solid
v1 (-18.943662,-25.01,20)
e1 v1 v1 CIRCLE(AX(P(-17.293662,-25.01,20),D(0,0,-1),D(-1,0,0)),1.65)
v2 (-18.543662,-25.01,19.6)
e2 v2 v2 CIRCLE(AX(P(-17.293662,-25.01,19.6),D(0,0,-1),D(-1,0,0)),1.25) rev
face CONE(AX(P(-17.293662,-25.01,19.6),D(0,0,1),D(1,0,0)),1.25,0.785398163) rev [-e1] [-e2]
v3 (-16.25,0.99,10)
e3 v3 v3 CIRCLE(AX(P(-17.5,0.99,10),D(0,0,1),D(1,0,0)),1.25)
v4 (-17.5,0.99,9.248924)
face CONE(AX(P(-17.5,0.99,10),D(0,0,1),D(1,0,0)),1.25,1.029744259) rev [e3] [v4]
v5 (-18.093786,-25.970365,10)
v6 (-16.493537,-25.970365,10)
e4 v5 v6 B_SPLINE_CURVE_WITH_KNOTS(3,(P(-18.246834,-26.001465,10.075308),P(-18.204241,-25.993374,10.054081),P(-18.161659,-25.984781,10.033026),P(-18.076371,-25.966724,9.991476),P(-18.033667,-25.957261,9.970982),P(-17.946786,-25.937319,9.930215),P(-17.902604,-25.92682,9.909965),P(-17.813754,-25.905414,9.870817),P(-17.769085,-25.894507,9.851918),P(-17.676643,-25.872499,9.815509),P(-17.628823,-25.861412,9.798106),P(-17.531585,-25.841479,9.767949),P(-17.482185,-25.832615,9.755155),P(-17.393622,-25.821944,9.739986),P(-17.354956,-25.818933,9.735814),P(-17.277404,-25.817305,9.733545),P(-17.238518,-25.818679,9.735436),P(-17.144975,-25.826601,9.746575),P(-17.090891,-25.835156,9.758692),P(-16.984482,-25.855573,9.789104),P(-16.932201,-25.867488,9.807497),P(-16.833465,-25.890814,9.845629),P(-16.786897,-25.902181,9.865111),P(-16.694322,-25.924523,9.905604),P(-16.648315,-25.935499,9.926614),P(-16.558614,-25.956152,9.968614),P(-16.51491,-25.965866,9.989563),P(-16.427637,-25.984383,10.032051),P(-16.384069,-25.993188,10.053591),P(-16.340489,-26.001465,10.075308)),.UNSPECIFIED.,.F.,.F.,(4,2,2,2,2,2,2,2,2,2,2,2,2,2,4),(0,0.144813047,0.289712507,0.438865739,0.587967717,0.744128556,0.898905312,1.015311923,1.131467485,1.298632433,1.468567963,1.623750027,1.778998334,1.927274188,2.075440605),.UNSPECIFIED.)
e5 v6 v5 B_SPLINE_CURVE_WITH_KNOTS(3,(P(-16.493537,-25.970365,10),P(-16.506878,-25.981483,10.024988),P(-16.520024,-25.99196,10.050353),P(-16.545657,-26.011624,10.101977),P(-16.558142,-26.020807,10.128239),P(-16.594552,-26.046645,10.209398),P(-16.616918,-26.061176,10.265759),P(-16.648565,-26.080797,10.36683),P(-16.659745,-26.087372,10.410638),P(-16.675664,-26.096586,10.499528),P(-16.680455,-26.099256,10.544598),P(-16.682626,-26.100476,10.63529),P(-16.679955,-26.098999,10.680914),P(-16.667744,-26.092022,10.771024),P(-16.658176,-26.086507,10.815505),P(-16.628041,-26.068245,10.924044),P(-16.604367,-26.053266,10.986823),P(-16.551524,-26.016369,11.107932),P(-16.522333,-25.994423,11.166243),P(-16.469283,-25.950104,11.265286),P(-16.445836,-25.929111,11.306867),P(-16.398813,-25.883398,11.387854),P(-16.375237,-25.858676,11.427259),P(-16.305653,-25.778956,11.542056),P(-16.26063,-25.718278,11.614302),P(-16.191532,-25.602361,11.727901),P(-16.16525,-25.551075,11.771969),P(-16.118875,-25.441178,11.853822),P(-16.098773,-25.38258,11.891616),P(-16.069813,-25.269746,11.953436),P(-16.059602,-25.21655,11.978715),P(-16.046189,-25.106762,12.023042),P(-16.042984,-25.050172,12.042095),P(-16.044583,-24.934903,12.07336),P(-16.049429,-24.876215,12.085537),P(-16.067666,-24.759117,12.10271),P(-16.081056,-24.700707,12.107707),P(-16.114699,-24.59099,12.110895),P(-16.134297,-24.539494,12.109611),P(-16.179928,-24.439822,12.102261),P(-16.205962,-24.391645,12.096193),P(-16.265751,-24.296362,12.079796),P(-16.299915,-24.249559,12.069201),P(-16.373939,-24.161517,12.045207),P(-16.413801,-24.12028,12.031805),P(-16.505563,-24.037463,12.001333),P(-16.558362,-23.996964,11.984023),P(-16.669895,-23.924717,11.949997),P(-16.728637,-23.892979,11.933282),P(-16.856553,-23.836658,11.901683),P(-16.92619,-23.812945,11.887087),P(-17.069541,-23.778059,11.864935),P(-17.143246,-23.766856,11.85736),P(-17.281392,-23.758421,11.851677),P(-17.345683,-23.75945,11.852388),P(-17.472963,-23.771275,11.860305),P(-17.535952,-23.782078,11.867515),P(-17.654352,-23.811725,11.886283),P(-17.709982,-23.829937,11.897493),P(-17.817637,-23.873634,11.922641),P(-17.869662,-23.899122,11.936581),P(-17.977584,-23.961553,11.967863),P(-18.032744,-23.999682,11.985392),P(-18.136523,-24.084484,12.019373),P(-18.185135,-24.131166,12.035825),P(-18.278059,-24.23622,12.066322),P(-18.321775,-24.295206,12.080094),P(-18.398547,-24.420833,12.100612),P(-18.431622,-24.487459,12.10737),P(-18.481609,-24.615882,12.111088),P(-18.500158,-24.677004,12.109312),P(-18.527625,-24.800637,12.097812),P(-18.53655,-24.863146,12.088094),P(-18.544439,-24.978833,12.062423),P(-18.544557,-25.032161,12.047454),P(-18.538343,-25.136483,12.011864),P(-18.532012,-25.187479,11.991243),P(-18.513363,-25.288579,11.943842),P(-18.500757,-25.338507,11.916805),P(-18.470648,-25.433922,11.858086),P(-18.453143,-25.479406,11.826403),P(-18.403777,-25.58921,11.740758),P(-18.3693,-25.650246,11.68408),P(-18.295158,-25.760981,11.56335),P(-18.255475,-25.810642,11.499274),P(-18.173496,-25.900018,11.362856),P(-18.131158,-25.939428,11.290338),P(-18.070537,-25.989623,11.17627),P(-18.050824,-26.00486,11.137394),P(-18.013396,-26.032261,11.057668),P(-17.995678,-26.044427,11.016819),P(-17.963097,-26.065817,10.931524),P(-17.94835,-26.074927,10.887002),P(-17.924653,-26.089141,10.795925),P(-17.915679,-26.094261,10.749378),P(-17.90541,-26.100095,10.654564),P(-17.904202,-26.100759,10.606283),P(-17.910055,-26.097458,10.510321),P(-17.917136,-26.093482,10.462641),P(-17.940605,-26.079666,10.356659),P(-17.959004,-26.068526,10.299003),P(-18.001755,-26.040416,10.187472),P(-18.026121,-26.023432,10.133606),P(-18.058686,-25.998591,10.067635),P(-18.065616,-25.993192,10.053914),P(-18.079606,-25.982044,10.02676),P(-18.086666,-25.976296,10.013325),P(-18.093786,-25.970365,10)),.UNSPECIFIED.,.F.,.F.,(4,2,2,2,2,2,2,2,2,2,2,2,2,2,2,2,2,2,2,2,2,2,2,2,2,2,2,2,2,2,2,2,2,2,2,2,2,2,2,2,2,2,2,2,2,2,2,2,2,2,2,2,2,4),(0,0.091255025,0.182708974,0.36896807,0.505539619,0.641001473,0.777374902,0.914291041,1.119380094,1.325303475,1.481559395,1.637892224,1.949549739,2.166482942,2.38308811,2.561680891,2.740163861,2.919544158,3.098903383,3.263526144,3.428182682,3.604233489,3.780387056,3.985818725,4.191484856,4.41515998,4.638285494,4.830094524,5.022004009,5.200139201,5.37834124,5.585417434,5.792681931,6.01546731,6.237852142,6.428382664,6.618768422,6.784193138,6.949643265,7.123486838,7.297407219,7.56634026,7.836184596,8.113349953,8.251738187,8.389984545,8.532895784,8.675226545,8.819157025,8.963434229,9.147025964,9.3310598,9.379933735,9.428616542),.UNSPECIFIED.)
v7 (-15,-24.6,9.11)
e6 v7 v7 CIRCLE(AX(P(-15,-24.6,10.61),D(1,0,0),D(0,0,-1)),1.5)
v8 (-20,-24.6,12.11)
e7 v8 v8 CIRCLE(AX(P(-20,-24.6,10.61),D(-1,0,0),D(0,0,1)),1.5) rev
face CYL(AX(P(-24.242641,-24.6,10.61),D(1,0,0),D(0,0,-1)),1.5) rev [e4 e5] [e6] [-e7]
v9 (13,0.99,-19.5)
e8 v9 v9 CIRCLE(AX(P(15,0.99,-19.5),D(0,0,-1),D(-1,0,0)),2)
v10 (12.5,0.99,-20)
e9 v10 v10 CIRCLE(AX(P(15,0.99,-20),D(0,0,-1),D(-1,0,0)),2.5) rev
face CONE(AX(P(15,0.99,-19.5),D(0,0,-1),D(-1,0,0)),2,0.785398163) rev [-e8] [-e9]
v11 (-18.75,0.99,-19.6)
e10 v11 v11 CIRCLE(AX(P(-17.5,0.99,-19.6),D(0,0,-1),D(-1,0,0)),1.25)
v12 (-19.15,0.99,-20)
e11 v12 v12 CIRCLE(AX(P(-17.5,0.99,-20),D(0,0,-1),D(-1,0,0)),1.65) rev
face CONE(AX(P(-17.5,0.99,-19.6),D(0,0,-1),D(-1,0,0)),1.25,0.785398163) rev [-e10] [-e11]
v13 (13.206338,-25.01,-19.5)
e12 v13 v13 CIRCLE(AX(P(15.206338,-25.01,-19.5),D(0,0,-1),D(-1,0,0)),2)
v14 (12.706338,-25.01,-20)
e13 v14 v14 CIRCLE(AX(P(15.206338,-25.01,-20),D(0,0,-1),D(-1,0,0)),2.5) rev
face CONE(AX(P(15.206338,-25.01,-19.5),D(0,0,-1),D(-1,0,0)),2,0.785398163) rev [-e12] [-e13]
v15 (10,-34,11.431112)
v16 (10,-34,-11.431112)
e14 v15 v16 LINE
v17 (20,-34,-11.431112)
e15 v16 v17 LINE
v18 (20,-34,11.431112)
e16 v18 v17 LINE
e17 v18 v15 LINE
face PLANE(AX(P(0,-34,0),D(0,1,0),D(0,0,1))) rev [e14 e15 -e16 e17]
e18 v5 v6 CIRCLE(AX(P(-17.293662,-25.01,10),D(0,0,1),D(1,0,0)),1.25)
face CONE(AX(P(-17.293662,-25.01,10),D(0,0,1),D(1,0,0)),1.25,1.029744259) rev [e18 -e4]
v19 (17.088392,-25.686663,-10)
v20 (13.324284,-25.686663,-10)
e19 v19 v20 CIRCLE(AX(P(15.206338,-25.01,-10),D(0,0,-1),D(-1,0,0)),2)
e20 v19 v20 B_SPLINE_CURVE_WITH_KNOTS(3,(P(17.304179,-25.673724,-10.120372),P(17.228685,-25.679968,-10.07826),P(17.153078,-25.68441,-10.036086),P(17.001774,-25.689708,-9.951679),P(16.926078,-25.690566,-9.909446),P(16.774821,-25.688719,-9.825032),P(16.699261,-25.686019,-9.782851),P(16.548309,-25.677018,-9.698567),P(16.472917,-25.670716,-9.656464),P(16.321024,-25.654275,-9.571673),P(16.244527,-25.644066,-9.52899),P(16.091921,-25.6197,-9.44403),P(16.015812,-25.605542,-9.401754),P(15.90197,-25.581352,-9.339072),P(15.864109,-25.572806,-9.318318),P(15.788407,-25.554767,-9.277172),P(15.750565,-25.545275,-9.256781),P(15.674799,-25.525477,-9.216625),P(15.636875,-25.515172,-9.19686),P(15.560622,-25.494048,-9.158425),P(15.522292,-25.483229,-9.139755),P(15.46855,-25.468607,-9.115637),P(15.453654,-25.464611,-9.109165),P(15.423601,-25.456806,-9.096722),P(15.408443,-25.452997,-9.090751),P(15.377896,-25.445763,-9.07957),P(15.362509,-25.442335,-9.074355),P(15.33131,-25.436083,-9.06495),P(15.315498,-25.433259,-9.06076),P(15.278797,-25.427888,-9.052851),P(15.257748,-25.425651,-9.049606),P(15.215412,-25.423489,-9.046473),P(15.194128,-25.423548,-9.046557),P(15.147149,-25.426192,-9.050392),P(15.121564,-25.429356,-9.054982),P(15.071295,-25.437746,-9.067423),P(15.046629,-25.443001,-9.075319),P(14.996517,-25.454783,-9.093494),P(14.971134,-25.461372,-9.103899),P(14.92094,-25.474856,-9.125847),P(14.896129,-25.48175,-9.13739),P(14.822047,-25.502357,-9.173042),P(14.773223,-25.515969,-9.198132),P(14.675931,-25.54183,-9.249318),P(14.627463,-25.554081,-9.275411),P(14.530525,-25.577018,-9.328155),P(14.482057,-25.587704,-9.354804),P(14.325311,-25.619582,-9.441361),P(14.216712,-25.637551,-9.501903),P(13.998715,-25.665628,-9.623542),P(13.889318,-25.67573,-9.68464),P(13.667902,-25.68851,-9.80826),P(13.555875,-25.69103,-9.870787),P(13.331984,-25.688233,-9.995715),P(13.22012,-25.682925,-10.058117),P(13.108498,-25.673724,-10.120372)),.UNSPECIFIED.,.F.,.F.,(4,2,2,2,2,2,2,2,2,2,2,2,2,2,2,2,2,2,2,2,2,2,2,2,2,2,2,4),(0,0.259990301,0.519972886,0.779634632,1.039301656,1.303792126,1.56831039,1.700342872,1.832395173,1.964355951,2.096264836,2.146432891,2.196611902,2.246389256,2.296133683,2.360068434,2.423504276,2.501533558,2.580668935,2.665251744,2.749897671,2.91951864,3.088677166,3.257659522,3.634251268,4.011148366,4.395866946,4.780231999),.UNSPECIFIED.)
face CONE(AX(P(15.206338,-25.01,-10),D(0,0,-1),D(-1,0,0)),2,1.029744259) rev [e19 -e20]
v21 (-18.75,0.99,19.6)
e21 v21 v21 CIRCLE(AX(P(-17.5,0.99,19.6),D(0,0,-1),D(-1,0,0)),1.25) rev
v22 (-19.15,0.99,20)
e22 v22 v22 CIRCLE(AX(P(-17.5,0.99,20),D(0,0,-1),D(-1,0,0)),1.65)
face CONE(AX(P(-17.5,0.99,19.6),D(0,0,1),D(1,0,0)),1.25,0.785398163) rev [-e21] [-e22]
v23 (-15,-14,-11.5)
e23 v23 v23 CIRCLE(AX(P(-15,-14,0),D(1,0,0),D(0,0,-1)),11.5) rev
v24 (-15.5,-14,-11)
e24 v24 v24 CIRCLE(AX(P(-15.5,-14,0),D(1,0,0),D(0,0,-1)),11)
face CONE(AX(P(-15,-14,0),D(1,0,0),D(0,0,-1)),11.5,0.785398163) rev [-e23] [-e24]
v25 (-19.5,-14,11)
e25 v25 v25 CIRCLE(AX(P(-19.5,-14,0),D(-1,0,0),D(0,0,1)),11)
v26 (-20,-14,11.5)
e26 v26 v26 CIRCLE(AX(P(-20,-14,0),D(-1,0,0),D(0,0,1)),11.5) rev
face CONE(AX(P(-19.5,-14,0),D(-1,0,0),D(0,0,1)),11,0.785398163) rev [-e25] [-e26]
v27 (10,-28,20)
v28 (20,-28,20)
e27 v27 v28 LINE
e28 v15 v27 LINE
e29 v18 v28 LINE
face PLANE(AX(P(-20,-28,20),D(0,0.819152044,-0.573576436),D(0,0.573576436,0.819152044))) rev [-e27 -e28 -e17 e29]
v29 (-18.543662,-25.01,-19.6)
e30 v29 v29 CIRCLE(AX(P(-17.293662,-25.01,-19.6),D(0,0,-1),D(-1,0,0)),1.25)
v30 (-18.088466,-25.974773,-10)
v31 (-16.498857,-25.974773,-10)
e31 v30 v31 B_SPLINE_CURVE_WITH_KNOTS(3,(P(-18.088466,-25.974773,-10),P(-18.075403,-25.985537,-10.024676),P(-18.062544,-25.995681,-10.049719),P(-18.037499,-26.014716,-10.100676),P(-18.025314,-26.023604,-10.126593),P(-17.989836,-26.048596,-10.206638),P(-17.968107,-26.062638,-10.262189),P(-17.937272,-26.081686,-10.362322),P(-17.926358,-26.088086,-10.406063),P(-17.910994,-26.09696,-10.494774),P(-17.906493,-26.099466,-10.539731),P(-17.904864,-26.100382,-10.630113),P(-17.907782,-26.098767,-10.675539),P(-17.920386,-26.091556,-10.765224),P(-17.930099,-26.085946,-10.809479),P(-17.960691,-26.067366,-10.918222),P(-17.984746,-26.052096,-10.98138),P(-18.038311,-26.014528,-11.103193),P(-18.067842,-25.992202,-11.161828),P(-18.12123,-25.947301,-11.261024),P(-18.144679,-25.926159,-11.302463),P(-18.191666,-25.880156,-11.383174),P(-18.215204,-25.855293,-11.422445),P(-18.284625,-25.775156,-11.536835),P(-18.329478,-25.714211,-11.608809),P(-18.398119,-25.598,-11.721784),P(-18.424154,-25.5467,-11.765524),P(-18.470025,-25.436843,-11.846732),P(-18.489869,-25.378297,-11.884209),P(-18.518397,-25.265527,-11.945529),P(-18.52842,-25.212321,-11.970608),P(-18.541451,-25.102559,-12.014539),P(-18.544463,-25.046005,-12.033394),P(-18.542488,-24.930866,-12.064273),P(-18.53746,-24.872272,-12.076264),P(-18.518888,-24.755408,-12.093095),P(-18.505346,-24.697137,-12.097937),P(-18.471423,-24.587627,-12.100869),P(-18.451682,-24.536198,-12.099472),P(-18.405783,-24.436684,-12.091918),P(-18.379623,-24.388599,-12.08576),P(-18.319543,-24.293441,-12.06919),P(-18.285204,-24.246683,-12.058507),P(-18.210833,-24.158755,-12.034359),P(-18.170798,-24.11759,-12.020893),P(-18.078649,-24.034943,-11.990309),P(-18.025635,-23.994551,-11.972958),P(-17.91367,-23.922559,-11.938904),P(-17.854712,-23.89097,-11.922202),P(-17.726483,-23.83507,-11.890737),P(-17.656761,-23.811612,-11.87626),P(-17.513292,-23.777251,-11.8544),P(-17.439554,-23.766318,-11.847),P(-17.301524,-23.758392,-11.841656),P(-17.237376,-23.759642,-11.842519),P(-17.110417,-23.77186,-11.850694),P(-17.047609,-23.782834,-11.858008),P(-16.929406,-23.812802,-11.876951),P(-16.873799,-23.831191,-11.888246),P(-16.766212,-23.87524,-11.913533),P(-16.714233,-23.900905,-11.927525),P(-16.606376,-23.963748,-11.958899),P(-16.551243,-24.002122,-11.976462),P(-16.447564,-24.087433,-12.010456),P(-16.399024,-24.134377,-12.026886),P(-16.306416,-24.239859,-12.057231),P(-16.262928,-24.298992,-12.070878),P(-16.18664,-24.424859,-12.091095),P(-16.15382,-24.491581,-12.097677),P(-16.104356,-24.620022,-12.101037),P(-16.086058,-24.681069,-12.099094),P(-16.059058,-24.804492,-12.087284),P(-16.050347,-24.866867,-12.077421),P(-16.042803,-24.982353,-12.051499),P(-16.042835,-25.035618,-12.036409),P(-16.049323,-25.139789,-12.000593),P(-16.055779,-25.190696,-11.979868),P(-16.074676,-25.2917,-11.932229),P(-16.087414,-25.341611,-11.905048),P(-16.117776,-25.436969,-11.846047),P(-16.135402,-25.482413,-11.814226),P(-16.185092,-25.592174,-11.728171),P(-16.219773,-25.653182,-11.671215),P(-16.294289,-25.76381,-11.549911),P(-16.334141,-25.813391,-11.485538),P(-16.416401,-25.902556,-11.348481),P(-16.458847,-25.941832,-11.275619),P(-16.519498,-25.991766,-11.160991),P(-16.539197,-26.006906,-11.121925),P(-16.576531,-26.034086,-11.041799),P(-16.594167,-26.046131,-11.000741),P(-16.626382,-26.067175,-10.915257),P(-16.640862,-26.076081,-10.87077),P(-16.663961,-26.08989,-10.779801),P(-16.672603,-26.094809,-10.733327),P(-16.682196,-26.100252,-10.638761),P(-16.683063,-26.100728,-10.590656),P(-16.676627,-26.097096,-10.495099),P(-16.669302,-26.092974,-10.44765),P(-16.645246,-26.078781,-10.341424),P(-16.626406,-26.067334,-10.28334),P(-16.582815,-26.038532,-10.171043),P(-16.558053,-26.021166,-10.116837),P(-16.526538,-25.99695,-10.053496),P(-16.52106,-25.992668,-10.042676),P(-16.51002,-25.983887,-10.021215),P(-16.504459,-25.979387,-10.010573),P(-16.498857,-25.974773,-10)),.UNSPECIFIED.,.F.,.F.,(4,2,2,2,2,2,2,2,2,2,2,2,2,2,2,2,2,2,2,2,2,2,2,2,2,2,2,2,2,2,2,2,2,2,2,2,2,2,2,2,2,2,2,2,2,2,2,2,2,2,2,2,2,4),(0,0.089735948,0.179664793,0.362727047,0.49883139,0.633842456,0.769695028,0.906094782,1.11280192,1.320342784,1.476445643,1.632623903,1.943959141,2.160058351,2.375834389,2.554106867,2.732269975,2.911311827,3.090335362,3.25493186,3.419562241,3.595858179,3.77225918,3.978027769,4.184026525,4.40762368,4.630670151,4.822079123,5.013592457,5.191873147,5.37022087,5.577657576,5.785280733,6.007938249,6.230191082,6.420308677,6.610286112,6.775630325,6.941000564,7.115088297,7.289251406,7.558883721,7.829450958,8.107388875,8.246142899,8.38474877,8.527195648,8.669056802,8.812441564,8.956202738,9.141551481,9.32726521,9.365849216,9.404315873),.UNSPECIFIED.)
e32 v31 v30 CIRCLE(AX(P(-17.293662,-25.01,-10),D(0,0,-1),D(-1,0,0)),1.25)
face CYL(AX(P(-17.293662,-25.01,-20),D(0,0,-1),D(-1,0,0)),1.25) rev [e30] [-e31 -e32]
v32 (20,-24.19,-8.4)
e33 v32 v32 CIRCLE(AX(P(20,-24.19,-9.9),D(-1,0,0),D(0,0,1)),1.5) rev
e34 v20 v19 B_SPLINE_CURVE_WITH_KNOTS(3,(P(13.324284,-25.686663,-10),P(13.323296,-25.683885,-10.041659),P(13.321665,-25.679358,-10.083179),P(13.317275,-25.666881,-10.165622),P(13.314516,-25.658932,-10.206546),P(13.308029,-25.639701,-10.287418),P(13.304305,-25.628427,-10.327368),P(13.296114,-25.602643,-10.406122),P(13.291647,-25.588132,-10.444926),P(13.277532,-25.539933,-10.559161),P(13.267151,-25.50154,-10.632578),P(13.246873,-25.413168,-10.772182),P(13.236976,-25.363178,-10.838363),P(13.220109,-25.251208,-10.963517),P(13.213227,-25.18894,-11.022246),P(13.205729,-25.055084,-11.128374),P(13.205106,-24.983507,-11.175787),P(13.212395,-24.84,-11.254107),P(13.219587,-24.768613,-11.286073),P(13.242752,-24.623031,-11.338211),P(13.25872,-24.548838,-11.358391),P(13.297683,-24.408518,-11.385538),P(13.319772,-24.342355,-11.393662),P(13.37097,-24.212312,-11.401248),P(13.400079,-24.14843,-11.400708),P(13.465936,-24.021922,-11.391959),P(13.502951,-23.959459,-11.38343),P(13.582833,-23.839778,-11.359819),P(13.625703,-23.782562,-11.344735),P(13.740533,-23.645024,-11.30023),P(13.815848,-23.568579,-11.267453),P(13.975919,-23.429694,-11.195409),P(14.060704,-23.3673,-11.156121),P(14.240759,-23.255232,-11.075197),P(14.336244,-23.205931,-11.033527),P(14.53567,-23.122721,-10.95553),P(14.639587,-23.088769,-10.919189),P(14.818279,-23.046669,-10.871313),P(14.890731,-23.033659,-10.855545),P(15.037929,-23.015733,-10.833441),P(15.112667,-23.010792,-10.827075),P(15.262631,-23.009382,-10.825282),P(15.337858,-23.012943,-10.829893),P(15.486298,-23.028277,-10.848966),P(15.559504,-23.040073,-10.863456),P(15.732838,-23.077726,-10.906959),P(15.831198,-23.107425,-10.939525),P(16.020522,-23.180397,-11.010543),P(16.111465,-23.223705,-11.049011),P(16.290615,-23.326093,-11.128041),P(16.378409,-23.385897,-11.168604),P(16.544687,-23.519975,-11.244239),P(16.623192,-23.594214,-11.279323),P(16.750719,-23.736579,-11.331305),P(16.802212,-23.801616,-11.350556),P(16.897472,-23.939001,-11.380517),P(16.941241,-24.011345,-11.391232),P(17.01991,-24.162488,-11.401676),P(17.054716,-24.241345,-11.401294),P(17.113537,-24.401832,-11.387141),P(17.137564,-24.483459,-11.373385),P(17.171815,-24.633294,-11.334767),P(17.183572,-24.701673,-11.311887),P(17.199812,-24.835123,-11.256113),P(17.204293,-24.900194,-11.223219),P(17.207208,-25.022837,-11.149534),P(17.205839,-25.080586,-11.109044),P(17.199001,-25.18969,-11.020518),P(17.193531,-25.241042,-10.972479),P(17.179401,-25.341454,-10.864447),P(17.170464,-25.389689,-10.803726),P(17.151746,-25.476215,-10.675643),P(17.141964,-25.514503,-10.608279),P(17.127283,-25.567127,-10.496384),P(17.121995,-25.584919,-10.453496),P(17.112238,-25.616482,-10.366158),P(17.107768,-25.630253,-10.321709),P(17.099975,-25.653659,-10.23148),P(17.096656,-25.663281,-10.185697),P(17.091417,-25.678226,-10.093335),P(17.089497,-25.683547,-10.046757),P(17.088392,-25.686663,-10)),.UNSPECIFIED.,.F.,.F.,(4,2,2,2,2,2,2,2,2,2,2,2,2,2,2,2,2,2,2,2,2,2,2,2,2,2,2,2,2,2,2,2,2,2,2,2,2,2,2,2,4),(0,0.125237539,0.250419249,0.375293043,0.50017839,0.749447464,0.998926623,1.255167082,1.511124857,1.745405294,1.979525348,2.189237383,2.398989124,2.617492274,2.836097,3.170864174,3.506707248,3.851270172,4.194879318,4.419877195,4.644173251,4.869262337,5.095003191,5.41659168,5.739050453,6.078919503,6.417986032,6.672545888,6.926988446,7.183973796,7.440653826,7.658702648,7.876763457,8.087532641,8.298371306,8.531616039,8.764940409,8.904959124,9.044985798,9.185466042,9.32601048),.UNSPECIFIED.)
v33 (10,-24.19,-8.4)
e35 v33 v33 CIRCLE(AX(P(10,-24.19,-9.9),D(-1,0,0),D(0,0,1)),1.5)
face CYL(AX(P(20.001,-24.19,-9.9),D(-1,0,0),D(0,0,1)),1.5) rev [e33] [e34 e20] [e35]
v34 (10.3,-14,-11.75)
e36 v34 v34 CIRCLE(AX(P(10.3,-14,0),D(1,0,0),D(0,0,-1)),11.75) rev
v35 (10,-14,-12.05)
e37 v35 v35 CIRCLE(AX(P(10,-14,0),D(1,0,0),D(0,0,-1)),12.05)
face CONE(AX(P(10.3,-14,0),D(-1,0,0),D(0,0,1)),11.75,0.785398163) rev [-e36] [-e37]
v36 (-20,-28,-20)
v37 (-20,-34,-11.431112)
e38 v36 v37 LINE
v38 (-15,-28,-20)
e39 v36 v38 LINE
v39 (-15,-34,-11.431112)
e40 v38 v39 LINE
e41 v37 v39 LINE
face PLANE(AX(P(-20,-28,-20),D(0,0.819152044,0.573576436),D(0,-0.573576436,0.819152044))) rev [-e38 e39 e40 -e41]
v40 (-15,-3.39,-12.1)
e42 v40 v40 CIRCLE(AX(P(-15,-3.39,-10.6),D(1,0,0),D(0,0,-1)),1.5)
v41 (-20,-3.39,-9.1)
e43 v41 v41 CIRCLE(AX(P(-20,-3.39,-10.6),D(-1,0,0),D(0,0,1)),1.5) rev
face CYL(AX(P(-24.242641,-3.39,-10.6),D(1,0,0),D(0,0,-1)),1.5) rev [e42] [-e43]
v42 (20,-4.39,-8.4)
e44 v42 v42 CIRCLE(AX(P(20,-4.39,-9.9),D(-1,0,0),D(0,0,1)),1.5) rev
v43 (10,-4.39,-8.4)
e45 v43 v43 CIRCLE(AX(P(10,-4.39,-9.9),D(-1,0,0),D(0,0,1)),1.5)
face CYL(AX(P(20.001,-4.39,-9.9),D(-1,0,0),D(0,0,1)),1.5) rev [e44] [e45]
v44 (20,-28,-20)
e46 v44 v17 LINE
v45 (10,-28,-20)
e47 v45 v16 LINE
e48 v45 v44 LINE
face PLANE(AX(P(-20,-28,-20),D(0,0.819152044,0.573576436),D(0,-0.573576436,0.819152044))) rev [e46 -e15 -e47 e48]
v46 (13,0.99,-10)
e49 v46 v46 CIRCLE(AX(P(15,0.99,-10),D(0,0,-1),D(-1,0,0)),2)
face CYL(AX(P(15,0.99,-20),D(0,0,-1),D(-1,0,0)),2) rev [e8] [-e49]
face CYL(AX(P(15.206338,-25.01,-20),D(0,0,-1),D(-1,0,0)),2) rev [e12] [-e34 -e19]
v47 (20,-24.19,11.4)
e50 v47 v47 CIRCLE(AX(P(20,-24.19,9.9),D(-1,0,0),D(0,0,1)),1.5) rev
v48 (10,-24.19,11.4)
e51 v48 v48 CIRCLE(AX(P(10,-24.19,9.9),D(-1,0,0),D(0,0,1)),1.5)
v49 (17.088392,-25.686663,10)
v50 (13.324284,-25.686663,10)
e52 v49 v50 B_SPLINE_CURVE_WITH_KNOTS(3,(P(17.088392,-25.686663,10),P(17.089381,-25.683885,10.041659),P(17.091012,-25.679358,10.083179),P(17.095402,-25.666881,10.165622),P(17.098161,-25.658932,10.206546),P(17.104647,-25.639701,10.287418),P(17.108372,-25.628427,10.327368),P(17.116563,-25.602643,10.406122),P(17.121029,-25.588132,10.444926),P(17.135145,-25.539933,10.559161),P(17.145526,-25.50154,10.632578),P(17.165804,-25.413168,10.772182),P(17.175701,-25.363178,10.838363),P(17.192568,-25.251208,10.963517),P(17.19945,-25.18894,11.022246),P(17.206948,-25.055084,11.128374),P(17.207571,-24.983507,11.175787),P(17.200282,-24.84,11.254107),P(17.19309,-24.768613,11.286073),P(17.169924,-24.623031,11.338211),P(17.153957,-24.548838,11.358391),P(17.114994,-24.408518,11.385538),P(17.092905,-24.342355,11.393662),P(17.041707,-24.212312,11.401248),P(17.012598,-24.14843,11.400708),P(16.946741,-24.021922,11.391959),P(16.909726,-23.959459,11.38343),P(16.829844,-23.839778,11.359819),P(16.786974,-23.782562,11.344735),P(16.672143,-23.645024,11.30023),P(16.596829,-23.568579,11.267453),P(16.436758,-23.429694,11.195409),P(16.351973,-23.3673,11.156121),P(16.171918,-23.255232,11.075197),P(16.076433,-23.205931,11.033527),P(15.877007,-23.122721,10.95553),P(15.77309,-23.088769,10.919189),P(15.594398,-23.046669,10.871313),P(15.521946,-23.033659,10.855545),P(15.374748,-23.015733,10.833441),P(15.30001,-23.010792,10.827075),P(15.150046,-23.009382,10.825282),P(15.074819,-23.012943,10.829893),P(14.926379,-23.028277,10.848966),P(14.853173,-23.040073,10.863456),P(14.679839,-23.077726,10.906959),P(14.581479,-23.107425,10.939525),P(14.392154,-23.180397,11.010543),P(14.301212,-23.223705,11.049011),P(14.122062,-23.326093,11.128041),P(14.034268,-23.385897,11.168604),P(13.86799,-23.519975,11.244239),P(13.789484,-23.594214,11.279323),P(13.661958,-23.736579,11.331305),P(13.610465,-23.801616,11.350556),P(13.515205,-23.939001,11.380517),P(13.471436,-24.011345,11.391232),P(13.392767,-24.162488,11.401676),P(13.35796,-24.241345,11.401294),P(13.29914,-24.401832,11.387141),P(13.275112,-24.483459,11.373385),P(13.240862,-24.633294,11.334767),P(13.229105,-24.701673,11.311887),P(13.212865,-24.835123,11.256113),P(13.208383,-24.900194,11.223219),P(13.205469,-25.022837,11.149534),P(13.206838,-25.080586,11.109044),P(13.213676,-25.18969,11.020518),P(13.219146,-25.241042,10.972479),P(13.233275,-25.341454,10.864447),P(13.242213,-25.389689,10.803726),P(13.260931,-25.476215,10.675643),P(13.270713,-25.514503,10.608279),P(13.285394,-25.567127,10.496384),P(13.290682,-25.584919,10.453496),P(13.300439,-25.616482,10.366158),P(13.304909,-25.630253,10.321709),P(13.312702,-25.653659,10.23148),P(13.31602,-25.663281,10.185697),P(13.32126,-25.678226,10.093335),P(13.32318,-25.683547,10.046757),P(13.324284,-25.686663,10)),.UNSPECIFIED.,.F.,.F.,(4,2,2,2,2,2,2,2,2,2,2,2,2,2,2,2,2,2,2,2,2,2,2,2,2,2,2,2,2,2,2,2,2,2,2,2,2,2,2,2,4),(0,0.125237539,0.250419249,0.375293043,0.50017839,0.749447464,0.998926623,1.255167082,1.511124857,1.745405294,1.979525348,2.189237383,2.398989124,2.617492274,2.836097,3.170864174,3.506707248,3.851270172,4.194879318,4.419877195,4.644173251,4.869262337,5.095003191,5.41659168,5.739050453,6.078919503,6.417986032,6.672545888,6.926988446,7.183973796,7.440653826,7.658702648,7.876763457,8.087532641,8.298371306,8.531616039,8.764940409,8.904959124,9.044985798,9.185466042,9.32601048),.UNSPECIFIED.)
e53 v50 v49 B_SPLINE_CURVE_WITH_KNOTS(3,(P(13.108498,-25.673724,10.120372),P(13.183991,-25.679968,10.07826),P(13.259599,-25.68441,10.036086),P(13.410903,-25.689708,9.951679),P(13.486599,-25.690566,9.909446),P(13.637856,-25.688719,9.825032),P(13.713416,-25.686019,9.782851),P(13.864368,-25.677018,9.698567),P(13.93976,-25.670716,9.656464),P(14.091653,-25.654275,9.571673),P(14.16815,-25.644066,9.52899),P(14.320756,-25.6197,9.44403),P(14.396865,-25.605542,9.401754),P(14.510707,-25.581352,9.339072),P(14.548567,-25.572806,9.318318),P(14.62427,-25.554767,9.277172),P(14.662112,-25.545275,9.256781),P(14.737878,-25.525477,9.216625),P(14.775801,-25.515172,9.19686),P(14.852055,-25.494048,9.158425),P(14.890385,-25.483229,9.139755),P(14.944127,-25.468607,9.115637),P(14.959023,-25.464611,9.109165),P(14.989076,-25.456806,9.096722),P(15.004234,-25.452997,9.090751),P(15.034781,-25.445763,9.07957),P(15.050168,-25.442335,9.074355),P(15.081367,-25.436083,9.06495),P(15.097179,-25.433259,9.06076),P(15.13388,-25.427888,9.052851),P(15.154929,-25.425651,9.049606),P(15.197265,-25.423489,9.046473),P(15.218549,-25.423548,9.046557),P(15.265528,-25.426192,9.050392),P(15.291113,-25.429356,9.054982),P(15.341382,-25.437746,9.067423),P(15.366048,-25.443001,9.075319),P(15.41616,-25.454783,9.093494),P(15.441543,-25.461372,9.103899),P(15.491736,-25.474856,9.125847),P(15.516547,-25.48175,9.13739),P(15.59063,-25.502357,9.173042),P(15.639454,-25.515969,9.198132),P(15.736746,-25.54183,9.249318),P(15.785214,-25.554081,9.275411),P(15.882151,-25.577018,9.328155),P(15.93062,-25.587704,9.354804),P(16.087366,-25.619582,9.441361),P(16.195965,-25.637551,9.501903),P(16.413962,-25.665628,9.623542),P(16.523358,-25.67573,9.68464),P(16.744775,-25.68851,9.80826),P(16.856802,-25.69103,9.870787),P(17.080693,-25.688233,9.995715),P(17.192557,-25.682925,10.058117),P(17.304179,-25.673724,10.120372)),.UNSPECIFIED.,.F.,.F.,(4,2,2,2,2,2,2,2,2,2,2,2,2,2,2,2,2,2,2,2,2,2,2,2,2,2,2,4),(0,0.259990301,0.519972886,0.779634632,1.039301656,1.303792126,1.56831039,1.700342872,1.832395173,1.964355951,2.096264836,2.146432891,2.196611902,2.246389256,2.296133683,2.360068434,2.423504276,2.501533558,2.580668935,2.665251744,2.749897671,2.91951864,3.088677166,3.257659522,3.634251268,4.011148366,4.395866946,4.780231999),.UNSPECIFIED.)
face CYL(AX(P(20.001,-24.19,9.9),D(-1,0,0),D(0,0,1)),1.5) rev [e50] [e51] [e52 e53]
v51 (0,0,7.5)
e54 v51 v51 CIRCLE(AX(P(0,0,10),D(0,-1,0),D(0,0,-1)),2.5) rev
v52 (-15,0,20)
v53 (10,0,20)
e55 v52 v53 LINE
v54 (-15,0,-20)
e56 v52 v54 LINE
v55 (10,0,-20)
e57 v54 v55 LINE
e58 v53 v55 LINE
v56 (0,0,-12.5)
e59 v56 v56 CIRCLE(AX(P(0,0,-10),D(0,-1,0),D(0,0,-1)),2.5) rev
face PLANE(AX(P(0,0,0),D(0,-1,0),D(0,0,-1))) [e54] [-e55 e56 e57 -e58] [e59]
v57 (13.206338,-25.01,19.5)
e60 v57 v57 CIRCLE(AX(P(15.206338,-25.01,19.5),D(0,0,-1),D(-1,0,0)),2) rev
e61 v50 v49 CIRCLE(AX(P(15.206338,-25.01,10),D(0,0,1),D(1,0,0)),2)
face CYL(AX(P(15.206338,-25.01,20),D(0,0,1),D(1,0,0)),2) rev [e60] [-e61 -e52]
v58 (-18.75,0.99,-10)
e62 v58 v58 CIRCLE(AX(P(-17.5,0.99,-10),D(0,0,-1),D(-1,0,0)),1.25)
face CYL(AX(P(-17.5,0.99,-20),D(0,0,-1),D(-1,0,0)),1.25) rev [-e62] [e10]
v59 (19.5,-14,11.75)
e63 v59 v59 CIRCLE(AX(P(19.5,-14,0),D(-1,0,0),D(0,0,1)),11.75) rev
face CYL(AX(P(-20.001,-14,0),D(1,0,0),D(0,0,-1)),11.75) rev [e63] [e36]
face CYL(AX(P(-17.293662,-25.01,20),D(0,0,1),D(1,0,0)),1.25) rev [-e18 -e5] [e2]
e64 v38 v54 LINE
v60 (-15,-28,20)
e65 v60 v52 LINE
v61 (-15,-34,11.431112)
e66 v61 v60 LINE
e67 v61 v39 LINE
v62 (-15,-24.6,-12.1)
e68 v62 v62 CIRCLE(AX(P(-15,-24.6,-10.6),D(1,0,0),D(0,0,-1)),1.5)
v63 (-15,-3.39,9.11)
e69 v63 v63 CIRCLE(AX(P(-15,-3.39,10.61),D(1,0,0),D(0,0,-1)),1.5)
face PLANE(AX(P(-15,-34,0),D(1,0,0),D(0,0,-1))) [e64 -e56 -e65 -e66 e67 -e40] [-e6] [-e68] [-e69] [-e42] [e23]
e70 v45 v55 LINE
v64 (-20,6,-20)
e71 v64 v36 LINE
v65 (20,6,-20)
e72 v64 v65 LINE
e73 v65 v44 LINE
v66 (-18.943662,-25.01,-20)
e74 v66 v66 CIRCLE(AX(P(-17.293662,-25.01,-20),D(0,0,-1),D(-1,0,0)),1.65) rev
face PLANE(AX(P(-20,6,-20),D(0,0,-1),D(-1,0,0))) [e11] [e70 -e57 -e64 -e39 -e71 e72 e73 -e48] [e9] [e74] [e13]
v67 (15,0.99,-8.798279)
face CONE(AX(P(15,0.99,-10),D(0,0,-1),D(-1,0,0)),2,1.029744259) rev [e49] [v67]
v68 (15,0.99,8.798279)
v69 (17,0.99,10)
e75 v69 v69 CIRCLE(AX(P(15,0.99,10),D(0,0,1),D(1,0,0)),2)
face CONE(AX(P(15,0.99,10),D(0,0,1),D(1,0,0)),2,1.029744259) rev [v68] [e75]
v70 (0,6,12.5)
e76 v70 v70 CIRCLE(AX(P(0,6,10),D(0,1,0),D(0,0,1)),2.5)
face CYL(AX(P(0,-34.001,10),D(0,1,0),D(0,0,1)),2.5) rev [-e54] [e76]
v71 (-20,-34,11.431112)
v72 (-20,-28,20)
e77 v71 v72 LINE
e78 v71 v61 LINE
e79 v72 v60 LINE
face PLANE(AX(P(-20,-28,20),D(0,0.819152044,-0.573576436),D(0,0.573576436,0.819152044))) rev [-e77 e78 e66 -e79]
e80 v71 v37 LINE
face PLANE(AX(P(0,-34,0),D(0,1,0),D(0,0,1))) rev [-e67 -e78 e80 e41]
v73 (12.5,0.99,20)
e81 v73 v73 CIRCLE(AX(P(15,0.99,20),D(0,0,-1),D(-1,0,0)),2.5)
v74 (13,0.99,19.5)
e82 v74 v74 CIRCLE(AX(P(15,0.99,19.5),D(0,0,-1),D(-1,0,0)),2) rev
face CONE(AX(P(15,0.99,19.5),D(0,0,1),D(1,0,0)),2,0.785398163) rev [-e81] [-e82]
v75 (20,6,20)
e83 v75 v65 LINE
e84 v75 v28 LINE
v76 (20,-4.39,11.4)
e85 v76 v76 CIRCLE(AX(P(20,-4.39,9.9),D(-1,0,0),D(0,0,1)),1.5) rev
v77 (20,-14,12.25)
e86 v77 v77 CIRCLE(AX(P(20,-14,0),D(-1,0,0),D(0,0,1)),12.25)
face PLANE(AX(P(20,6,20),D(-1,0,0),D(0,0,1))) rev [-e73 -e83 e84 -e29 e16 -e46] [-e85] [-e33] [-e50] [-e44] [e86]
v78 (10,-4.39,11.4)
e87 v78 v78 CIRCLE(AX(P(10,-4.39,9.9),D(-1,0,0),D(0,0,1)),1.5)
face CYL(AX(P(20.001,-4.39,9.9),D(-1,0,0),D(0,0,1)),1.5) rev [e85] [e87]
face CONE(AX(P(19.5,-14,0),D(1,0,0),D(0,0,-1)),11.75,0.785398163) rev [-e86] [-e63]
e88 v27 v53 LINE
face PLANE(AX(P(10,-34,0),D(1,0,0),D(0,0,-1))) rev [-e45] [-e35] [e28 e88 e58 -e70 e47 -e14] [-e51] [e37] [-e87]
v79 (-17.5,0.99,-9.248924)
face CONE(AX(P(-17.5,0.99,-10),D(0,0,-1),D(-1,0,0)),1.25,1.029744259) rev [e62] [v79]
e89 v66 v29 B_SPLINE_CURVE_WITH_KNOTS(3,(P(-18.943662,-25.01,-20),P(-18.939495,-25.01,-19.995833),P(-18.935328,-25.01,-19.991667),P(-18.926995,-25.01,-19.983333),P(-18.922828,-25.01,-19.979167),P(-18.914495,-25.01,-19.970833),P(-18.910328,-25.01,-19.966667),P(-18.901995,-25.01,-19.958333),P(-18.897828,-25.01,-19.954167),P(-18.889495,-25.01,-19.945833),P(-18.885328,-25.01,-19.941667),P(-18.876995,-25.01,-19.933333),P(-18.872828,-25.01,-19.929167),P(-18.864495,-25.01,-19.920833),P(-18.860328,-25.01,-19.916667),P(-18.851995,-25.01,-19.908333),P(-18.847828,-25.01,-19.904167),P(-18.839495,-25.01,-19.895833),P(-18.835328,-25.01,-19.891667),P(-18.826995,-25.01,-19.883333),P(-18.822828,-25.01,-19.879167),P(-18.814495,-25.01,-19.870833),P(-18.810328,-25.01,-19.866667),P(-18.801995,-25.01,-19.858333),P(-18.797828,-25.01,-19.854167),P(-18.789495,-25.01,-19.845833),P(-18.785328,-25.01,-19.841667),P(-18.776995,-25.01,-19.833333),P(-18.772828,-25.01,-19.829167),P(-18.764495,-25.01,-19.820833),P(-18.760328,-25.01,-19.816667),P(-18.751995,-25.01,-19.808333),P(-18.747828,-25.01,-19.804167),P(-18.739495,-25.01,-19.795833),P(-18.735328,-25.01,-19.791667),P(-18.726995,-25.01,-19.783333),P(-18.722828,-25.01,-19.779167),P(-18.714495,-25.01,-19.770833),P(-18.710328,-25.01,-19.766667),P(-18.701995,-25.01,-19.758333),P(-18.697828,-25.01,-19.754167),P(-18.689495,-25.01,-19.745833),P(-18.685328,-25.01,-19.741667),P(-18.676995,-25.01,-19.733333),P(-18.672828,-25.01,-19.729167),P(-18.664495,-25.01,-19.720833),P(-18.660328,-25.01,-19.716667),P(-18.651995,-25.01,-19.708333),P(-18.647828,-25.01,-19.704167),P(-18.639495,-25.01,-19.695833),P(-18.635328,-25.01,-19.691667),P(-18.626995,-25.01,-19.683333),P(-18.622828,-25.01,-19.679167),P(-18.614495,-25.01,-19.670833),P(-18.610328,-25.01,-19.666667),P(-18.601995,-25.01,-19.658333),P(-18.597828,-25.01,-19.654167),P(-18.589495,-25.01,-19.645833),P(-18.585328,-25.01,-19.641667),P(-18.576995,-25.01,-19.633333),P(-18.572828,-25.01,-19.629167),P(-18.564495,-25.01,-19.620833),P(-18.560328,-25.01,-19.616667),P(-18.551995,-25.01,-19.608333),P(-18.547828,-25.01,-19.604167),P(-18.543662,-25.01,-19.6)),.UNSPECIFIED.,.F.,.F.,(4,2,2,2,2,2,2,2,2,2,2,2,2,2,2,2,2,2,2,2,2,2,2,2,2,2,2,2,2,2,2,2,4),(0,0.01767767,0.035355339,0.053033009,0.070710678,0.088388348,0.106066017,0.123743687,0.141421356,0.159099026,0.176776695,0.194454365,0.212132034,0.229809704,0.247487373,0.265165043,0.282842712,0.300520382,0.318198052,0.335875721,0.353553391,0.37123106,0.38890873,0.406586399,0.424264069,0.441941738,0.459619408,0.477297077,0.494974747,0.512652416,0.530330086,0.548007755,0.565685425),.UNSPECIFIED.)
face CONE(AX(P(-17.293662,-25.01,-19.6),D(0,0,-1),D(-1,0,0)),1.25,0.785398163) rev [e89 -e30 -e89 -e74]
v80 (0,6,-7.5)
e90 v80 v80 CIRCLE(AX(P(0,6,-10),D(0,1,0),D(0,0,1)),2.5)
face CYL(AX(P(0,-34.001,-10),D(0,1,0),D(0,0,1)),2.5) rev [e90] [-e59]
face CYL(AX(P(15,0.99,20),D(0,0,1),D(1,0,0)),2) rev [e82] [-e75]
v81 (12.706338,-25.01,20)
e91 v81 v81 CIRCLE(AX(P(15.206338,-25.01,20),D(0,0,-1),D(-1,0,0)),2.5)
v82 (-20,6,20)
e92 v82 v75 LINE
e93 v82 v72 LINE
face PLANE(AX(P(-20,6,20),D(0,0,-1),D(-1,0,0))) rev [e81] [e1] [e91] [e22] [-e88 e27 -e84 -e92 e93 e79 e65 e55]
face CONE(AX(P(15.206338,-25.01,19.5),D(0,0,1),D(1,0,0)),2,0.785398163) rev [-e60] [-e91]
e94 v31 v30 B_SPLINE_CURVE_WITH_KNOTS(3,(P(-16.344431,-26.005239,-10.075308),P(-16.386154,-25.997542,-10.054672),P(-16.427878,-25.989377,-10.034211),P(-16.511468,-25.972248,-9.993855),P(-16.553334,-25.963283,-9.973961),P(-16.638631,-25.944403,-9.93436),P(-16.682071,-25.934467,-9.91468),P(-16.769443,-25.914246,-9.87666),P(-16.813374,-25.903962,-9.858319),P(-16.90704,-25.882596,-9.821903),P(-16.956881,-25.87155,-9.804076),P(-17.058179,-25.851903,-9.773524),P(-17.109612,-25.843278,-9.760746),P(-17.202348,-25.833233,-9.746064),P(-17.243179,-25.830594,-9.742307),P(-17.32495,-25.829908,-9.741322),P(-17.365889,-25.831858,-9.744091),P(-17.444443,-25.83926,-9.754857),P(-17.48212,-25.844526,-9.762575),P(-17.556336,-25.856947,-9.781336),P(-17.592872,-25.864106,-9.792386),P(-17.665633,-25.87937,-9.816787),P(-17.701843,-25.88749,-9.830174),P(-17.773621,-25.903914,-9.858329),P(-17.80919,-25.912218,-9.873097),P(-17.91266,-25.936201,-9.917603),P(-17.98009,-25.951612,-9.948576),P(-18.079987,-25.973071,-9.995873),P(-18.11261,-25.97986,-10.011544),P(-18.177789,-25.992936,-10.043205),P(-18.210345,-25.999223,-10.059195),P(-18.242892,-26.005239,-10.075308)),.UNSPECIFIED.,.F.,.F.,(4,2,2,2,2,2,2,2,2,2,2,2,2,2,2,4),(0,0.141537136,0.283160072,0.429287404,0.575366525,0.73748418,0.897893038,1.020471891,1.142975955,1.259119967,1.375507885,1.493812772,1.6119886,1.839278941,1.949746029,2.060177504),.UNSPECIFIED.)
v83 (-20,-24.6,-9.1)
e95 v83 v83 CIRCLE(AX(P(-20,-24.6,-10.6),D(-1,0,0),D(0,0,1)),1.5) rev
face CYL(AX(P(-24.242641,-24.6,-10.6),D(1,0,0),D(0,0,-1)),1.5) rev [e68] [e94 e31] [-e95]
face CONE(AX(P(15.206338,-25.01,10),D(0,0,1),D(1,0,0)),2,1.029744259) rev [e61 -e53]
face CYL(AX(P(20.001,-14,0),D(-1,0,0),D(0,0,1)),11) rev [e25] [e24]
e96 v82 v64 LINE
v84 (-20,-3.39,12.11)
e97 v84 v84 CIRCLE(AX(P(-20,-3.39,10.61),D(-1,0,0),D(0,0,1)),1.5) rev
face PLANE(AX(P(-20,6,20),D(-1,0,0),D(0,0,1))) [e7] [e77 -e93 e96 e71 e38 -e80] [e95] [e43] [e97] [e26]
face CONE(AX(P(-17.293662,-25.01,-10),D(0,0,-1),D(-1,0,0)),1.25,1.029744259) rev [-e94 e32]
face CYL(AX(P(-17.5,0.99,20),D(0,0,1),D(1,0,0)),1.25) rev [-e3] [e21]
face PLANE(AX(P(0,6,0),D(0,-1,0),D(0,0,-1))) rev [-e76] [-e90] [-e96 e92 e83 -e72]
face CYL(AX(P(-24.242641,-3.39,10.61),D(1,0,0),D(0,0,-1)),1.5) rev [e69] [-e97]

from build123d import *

# Parameters (mm, degrees)
SKETCH_1_W          = 40
SKETCH_1_H          = 40
EXTRUDE_1_DEPTH     = 6
SKETCH_1_3_W        = 5
SKETCH_1_3_H        = 40
SKETCH_1_3_W_2      = 10
EXTRUDE_2_DEPTH     = 34
CUT_EXTRUDE_1_DEPTH = 20
CUT_EXTRUDE_2_REACH = 50.99
SKETCH_4_R          = 2.5
SKETCH_5_R          = 1.5
CUT_EXTRUDE_3_DEPTH = 5
CUT_EXTRUDE_4_REACH = 51.558
SKETCH_7_R          = 1.5
CUT_EXTRUDE_5_REACH = 58.178
SKETCH_8_R          = 11.75
CUT_EXTRUDE_6_REACH = 58.178
SKETCH_9_R          = 11
CHAMFER_1_SIZE      = 0.5
CHAMFER_2_SIZE      = 0.3
CHAMFER_3_SIZE      = 0.5
CHAMFER_4_SIZE      = 0.5
CHAMFER_5_SIZE      = 0.5
CHAMFER_6_SIZE      = 0.5
CHAMFER_7_SIZE      = 0.4
CHAMFER_8_SIZE      = 0.4
CHAMFER_9_SIZE      = 0.5
CHAMFER_10_SIZE     = 0.5
CHAMFER_11_SIZE     = 0.4
CHAMFER_12_SIZE     = 0.4


# Read off the part's stored shape, not the designer's step: 高级异型孔6, 高级异型孔7, 镜向4
with BuildPart() as part:
    # 草图1 → 凸台-拉伸1 (new body)
    with BuildSketch(Plane(origin=(0, 0, 0), x_dir=(1, 0, 0), z_dir=(0, 1, 0))):
        Rectangle(SKETCH_1_W, SKETCH_1_H)
    extrude(amount=EXTRUDE_1_DEPTH)

    # 草图1<3> → 凸台-拉伸2 (add)
    with BuildSketch(Plane(origin=(0, 0, 0), x_dir=(1, 0, 0), z_dir=(0, 1, 0))):
        with Locations((-17.5, 0)):
            Rectangle(SKETCH_1_3_W, SKETCH_1_3_H)
        with Locations((15, 0)):
            Rectangle(SKETCH_1_3_W_2, SKETCH_1_3_H)
    extrude(amount=-EXTRUDE_2_DEPTH)

    # 草图3 → 切除-拉伸1 (cut, symmetric)
    with BuildSketch(Plane(origin=(0, 0, 0), x_dir=(0, 0, -1), z_dir=(1, 0, 0))):
        Polygon((20, -28), (11.43111196, -34), (20, -34), align=None)
        Polygon((-20, -34), (-20, -28), (-11.43111196, -34), align=None)
    extrude(amount=CUT_EXTRUDE_1_DEPTH, both=True, mode=Mode.SUBTRACT)

    # 草图4 → 切除-拉伸2 (cut, up to next)
    with BuildSketch(Plane(origin=(0, 6, 0), x_dir=(1, 0, 0), z_dir=(0, 1, 0)), mode=Mode.PRIVATE) as cut_extrude_2_sk1:
        with Locations(Location((0, -10, 0), (0, 0, 270))):
            Circle(SKETCH_4_R)
    cut_extrude_2_tool1 = extrude(cut_extrude_2_sk1.sketch, amount=-CUT_EXTRUDE_2_REACH, mode=Mode.PRIVATE) & part.part
    # 草图4 → 切除-拉伸2 (cut, up to next)
    with BuildSketch(Plane(origin=(0, 6, 0), x_dir=(1, 0, 0), z_dir=(0, 1, 0)), mode=Mode.PRIVATE) as cut_extrude_2_sk2:
        with Locations(Location((0, 10, 0), (0, 0, 270))):
            Circle(SKETCH_4_R)
    cut_extrude_2_tool2 = extrude(cut_extrude_2_sk2.sketch, amount=-CUT_EXTRUDE_2_REACH, mode=Mode.PRIVATE) & part.part
    add(cut_extrude_2_tool1.solids().sort_by_distance((0, 6, 10))[0], mode=Mode.SUBTRACT)
    add(cut_extrude_2_tool2.solids().sort_by_distance((0, 6, -10))[0], mode=Mode.SUBTRACT)

    # 草图5 → 切除-拉伸3 (cut)
    with BuildSketch(Plane(origin=(-15, 0, 0), x_dir=(0, 0, -1), z_dir=(1, 0, 0))):
        with Locations((-10.61, -3.39)):
            Circle(SKETCH_5_R)
        with Locations((-10.61, -24.6)):
            Circle(SKETCH_5_R)
        with Locations((10.6, -24.6)):
            Circle(SKETCH_5_R)
        with Locations((10.6, -3.39)):
            Circle(SKETCH_5_R)
    extrude(amount=-CUT_EXTRUDE_3_DEPTH, mode=Mode.SUBTRACT)

    # 草图7 → 切除-拉伸4 (cut, up to next)
    with BuildSketch(Plane.ZY.offset(-10), mode=Mode.PRIVATE) as cut_extrude_4_sk1:
        with Locations((9.9, -4.39)):
            Circle(SKETCH_7_R)
    cut_extrude_4_tool1 = extrude(cut_extrude_4_sk1.sketch, amount=-CUT_EXTRUDE_4_REACH, mode=Mode.PRIVATE) & part.part
    # 草图7 → 切除-拉伸4 (cut, up to next)
    with BuildSketch(Plane.ZY.offset(-10), mode=Mode.PRIVATE) as cut_extrude_4_sk2:
        with Locations((9.9, -24.19)):
            Circle(SKETCH_7_R)
    cut_extrude_4_tool2 = extrude(cut_extrude_4_sk2.sketch, amount=-CUT_EXTRUDE_4_REACH, mode=Mode.PRIVATE) & part.part
    # 草图7 → 切除-拉伸4 (cut, up to next)
    with BuildSketch(Plane.ZY.offset(-10), mode=Mode.PRIVATE) as cut_extrude_4_sk3:
        with Locations((-9.9, -24.19)):
            Circle(SKETCH_7_R)
    cut_extrude_4_tool3 = extrude(cut_extrude_4_sk3.sketch, amount=-CUT_EXTRUDE_4_REACH, mode=Mode.PRIVATE) & part.part
    # 草图7 → 切除-拉伸4 (cut, up to next)
    with BuildSketch(Plane.ZY.offset(-10), mode=Mode.PRIVATE) as cut_extrude_4_sk4:
        with Locations((-9.9, -4.39)):
            Circle(SKETCH_7_R)
    cut_extrude_4_tool4 = extrude(cut_extrude_4_sk4.sketch, amount=-CUT_EXTRUDE_4_REACH, mode=Mode.PRIVATE) & part.part
    add(cut_extrude_4_tool1.solids().sort_by_distance((10, -4.39, 9.9))[0], mode=Mode.SUBTRACT)
    add(cut_extrude_4_tool2.solids().sort_by_distance((10, -24.19, 9.9))[0], mode=Mode.SUBTRACT)
    add(cut_extrude_4_tool3.solids().sort_by_distance((10, -24.19, -9.9))[0], mode=Mode.SUBTRACT)
    add(cut_extrude_4_tool4.solids().sort_by_distance((10, -4.39, -9.9))[0], mode=Mode.SUBTRACT)

    # 草图8 → 切除-拉伸5 (cut, up to next)
    with BuildSketch(Plane(origin=(20, 0, 0), x_dir=(0, 0, -1), z_dir=(1, 0, 0)), mode=Mode.PRIVATE) as cut_extrude_5_sk1:
        with Locations((0, -14)):
            Circle(SKETCH_8_R)
    cut_extrude_5_tool1 = extrude(cut_extrude_5_sk1.sketch, amount=-CUT_EXTRUDE_5_REACH, mode=Mode.PRIVATE) & part.part
    add(cut_extrude_5_tool1.solids().sort_by_distance((20, -14, 0))[0], mode=Mode.SUBTRACT)

    # 草图9 → 切除-拉伸6 (cut, up to next)
    with BuildSketch(Plane.ZY.offset(20), mode=Mode.PRIVATE) as cut_extrude_6_sk1:
        with Locations((0, -14)):
            Circle(SKETCH_9_R)
    cut_extrude_6_tool1 = extrude(cut_extrude_6_sk1.sketch, amount=-CUT_EXTRUDE_6_REACH, mode=Mode.PRIVATE) & part.part
    add(cut_extrude_6_tool1.solids().sort_by_distance((-20, -14, 0))[0], mode=Mode.SUBTRACT)

    # 倒角1
    chamfer_1_edges = [part.edges().sort_by_distance(p)[0] for p in [
        (20, -14, 11.75),
    ]]
    chamfer(chamfer_1_edges, length=CHAMFER_1_SIZE)

    # 倒角2
    chamfer_2_edges = [part.edges().sort_by_distance(p)[0] for p in [
        (10, -14, 11.75),
    ]]
    chamfer(chamfer_2_edges, length=CHAMFER_2_SIZE)

    # 倒角3
    chamfer_3_edges = [part.edges().sort_by_distance(p)[0] for p in [
        (-20, -14, -11),
    ]]
    chamfer(chamfer_3_edges, length=CHAMFER_3_SIZE)

    # 倒角4
    chamfer_4_edges = [part.edges().sort_by_distance(p)[0] for p in [
        (-15, -14, -11),
    ]]
    chamfer(chamfer_4_edges, length=CHAMFER_4_SIZE)

    # 高级异型孔6 outline → 高级异型孔6 (revolve, cut)
    with BuildSketch(Plane(origin=(-17.29366154, -25.01, 0), x_dir=(1, 0, 0), z_dir=(0, -1, 0))):
        Polygon((0, -20), (1.250000655, -20), (1.25, -10), (0.81997305, -9.741613741), (0, -9.741613741), align=None)
    revolve(axis=Axis((-17.29366154, -25.01, 0), (0, 0, 1)), mode=Mode.SUBTRACT)

    # Other 6 2 outline → Other 6 2 (revolve, cut)
    with BuildSketch(Plane(origin=(-17.5, 0.99, 0), x_dir=(1, 0, 0), z_dir=(0, -1, 0))):
        Polygon((1.25, -20), (1.25, -10), (0, -9.248924226), (0, -20), align=None)
    revolve(axis=Axis((-17.5, 0.99, 0), (0, 0, 1)), mode=Mode.SUBTRACT)

    # 高级异型孔7 outline → 高级异型孔7 (revolve, cut)
    with BuildSketch(Plane(origin=(15, 0.99, 0), x_dir=(1, 0, 0), z_dir=(0, -1, 0))):
        Polygon((2, -20), (2, -10), (0, -8.798278762), (0, -20), align=None)
    revolve(axis=Axis((15, 0.99, 0), (0, 0, 1)), mode=Mode.SUBTRACT)

    # Other 7 2 outline → Other 7 2 (revolve, cut)
    with BuildSketch(Plane(origin=(15.20633846, -25.01, 0), x_dir=(1, 0, 0), z_dir=(0, -1, 0))):
        Polygon((2, -20), (2, -10), (0.412753929, -9.046286343), (0, -9.046286343), (0, -20), align=None)
    revolve(axis=Axis((15.20633846, -25.01, 0), (0, 0, 1)), mode=Mode.SUBTRACT)

    # 倒角5
    chamfer_5_edges = [part.edges().sort_by_distance(p)[0] for p in [
        (13, 0.99, -20),
    ]]
    chamfer(chamfer_5_edges, length=CHAMFER_5_SIZE)

    # 倒角6
    chamfer_6_edges = [part.edges().sort_by_distance(p)[0] for p in [
        (13.20633846, -25.01, -20),
    ]]
    chamfer(chamfer_6_edges, length=CHAMFER_6_SIZE)

    # 倒角7
    chamfer_7_edges = [part.edges().sort_by_distance(p)[0] for p in [
        (-18.543662195, -25.01, -20),
    ]]
    chamfer(chamfer_7_edges, length=CHAMFER_7_SIZE)

    # 倒角8
    chamfer_8_edges = [part.edges().sort_by_distance(p)[0] for p in [
        (-18.75, 0.99, -20),
    ]]
    chamfer(chamfer_8_edges, length=CHAMFER_8_SIZE)

    # 镜向4 outline → 镜向4 (revolve, cut)
    with BuildSketch(Plane(origin=(-17.29366154, -25.01, 0), x_dir=(1, 0, 0), z_dir=(0, -1, 0))):
        Polygon((0.807641167, 9.734203998), (1.25, 10), (1.25, 20), (0, 20), (0, 9.734203998), align=None)
    revolve(axis=Axis((-17.29366154, -25.01, 0), (0, 0, 1)), mode=Mode.SUBTRACT)

    # Mirror 4 2 outline → Mirror 4 2 (revolve, cut)
    with BuildSketch(Plane(origin=(-17.5, 0.99, 0), x_dir=(1, 0, 0), z_dir=(0, -1, 0))):
        Polygon((0, 9.248924226), (1.25, 10), (1.25, 20), (0, 20), align=None)
    revolve(axis=Axis((-17.5, 0.99, 0), (0, 0, 1)), mode=Mode.SUBTRACT)

    # Mirror 4 3 outline → Mirror 4 3 (revolve, cut)
    with BuildSketch(Plane(origin=(15, 0.99, 0), x_dir=(1, 0, 0), z_dir=(0, -1, 0))):
        Polygon((0, 8.798278762), (2, 10), (2, 20), (0, 20), align=None)
    revolve(axis=Axis((15, 0.99, 0), (0, 0, 1)), mode=Mode.SUBTRACT)

    # Mirror 4 4 outline → Mirror 4 4 (revolve, cut)
    with BuildSketch(Plane(origin=(15.20633846, -25.01, 0), x_dir=(1, 0, 0), z_dir=(0, -1, 0))):
        Polygon((0.412753929, 9.046286343), (2, 10), (2, 20), (0, 20), (0, 9.046286343), align=None)
    revolve(axis=Axis((15.20633846, -25.01, 0), (0, 0, 1)), mode=Mode.SUBTRACT)

    # 倒角9
    chamfer_9_edges = [part.edges().sort_by_distance(p)[0] for p in [
        (13.20633846, -25.01, 20),
    ]]
    chamfer(chamfer_9_edges, length=CHAMFER_9_SIZE)

    # 倒角10
    chamfer_10_edges = [part.edges().sort_by_distance(p)[0] for p in [
        (13, 0.99, 20),
    ]]
    chamfer(chamfer_10_edges, length=CHAMFER_10_SIZE)

    # 倒角11
    chamfer_11_edges = [part.edges().sort_by_distance(p)[0] for p in [
        (-18.54366154, -25.01, 20),
    ]]
    chamfer(chamfer_11_edges, length=CHAMFER_11_SIZE)

    # 倒角12
    chamfer_12_edges = [part.edges().sort_by_distance(p)[0] for p in [
        (-18.75, 0.99, 20),
    ]]
    chamfer(chamfer_12_edges, length=CHAMFER_12_SIZE)


solid = part.part
